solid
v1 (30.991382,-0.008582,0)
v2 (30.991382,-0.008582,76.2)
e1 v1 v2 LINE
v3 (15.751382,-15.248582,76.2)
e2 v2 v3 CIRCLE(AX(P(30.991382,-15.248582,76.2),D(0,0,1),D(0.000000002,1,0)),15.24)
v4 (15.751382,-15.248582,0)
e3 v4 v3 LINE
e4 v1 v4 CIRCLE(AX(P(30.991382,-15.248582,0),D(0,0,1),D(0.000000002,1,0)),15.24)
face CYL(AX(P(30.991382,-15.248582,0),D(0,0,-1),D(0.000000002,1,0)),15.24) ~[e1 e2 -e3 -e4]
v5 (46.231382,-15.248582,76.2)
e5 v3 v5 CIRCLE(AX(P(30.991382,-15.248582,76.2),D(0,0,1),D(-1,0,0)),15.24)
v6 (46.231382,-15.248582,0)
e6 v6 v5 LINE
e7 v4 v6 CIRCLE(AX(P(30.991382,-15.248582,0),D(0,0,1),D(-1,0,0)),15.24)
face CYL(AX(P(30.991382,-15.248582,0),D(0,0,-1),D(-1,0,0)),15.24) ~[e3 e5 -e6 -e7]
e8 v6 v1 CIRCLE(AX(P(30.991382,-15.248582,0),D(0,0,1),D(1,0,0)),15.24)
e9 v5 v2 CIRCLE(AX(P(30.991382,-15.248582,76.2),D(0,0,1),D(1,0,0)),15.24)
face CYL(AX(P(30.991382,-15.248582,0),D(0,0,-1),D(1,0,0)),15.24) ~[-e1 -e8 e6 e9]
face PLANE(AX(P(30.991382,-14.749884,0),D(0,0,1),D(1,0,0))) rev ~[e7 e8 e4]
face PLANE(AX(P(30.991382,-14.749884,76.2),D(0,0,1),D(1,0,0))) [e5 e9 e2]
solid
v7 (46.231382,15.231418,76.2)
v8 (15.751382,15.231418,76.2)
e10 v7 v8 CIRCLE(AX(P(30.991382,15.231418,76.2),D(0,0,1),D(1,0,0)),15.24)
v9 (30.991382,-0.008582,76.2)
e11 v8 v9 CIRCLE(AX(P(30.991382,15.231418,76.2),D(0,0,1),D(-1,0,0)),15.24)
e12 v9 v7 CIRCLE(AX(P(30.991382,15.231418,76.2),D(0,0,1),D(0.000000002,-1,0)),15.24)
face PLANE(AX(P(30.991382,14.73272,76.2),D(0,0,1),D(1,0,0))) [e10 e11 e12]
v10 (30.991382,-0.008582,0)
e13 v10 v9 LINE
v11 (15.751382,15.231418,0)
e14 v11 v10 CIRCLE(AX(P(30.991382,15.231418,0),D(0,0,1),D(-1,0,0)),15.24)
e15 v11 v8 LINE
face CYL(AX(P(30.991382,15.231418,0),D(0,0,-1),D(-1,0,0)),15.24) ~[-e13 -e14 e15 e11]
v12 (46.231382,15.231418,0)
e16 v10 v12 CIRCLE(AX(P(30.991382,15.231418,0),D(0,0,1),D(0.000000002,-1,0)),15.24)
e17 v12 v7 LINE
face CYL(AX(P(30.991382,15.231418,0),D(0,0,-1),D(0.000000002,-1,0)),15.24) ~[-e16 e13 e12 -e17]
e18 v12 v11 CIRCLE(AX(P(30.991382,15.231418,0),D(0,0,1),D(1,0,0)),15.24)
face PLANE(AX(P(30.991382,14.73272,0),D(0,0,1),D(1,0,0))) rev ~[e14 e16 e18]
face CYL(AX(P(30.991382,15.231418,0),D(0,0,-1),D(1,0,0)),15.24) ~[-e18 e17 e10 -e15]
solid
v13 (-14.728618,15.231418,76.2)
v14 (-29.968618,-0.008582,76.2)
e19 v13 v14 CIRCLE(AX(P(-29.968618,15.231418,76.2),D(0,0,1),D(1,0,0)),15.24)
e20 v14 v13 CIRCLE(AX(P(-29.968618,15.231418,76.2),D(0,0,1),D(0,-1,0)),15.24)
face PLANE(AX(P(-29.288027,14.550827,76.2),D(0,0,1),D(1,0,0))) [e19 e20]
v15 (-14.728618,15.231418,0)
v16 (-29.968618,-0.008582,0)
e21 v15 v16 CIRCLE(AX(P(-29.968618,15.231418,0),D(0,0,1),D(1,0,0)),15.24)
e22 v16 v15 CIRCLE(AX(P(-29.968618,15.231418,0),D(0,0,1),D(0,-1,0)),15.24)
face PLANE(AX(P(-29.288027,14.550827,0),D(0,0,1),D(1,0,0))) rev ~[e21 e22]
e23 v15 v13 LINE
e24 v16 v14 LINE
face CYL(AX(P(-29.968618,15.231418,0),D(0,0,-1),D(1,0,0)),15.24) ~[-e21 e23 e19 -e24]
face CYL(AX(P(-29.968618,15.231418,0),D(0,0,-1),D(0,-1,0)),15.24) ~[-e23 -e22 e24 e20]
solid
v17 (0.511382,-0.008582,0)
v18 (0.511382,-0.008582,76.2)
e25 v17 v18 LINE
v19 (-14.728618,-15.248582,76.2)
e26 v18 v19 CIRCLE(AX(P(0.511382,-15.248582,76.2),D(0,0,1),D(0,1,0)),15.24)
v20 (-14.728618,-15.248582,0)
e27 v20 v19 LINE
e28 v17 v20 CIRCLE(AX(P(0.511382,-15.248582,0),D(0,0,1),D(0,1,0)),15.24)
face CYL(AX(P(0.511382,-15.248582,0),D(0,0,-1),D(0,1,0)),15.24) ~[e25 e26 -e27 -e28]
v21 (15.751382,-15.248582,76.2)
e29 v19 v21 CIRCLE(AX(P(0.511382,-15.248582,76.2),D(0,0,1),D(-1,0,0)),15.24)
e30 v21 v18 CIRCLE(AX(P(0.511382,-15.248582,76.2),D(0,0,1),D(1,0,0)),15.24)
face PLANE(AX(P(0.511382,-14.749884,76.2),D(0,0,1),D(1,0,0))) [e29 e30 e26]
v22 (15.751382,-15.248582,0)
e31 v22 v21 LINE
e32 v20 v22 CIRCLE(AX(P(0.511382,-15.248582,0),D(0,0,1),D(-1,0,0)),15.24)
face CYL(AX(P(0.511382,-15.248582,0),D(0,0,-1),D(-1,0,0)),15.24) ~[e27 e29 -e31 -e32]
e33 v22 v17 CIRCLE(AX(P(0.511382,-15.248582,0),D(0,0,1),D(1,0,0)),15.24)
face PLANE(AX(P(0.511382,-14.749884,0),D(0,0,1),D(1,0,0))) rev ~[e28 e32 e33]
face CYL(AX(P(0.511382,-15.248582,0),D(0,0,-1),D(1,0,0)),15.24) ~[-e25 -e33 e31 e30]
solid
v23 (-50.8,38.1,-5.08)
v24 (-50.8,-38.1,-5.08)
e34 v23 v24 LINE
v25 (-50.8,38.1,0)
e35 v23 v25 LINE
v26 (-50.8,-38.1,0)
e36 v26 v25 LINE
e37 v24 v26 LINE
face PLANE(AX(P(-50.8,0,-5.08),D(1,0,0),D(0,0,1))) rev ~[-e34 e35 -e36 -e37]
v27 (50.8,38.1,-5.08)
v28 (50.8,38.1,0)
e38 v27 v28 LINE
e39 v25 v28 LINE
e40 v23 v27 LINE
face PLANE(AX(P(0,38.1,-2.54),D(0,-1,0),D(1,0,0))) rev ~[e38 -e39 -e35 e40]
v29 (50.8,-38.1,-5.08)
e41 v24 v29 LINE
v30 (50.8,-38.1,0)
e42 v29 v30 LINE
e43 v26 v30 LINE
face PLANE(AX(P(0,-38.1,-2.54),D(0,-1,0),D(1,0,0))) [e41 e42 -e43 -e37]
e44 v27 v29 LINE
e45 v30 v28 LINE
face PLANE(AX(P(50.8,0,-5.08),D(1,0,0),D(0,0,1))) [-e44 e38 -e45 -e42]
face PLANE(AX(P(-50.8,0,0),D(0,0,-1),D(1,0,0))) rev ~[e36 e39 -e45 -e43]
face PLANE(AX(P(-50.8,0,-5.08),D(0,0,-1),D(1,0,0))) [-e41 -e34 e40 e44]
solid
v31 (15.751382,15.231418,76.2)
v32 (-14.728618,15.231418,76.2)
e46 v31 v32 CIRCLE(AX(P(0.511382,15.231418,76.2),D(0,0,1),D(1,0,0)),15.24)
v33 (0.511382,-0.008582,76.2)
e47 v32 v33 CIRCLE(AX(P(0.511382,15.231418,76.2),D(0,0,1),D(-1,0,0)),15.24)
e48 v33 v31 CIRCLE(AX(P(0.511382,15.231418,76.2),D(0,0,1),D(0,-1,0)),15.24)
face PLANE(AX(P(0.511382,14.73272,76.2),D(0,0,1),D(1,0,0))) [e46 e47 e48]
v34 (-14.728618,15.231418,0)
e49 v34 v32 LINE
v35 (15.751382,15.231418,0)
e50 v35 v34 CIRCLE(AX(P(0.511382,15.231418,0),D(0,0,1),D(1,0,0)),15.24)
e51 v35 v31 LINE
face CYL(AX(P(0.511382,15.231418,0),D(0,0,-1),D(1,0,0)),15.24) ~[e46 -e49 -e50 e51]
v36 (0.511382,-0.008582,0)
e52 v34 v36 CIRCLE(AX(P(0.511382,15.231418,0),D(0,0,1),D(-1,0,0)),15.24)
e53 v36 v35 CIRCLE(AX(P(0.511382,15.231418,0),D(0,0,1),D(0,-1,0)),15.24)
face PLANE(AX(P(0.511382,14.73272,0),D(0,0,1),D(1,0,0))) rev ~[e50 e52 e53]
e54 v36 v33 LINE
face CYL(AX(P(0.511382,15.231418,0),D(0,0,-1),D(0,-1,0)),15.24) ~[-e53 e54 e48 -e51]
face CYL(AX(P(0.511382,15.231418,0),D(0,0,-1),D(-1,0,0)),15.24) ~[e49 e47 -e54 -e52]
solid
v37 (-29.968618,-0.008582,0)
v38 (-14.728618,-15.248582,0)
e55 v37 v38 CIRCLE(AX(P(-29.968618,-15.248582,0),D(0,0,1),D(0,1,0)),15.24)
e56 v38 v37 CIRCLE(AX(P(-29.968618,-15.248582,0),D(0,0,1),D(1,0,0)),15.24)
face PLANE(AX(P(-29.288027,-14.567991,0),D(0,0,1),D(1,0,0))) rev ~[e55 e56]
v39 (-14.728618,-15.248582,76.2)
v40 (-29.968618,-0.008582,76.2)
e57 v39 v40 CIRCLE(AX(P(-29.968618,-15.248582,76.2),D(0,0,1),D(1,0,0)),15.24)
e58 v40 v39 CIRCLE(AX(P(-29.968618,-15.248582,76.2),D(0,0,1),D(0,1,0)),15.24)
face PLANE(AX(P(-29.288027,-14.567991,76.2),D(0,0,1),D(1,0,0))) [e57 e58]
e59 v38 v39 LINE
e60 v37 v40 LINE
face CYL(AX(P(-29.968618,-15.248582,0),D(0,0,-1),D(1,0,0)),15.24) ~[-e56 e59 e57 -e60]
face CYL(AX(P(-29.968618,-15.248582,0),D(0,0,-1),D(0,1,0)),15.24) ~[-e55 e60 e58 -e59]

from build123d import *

# Parameters (mm, degrees)
F1_DEPTH = 76.2
F2_W     = 101.6
F2_H     = 5.08
F3_DEPTH = 38.1


# Not quite as in the source:
# - a feature names something its author has since deleted; it is built from what else it names


with BuildPart() as f1:
    # F0 (on Top) → F1 (new body)
    with BuildSketch(Plane.XY):
        with BuildLine():
            ThreePointArc((-29.9686177893, -0.0085821988), (-40.7449251346, -26.0248895441), (-14.7286177893, -15.2485821988))
            ThreePointArc((-14.7286177893, -15.2485821988), (-19.192310444, -4.4722748535), (-29.9686177893, -0.0085821988))
        make_face()
    extrude(amount=F1_DEPTH)


with BuildPart() as f1b:
    # F0 (on Top) → F1, piece 2 (new body)
    with BuildSketch(Plane.XY):
        with BuildLine():
            ThreePointArc((0.5113822094, -0.0085821988), (-10.264925135, -4.472274854), (-14.7286177893, -15.2485821988))
            ThreePointArc((-14.7286177893, -15.2485821988), (0.5113822107, -30.4885821988), (15.7513822107, -15.2485821988))
            ThreePointArc((15.7513822107, -15.2485821988), (11.2876895555, -4.4722748531), (0.5113822094, -0.0085821988))
        make_face()
    extrude(amount=F1_DEPTH)


with BuildPart() as f1c:
    # F0 (on Top) → F1, piece 3 (new body)
    with BuildSketch(Plane.XY):
        with BuildLine():
            ThreePointArc((-14.7286177893, 15.2314178012), (-40.7449251346, 26.0077251465), (-29.9686177893, -0.0085821988))
            ThreePointArc((-29.9686177893, -0.0085821988), (-19.192310444, 4.4551104559), (-14.7286177893, 15.2314178012))
        make_face()
    extrude(amount=F1_DEPTH)


with BuildPart() as f1d:
    # F0 (on Top) → F1, piece 4 (new body)
    with BuildSketch(Plane.XY):
        with BuildLine():
            ThreePointArc((30.9913822354, -0.0085821988), (20.2150748742, -4.4722748448), (15.7513822107, -15.2485821988))
            ThreePointArc((15.7513822107, -15.2485821988), (30.9913822107, -30.4885821988), (46.2313822107, -15.2485821988))
            ThreePointArc((46.2313822107, -15.2485821988), (41.7676895647, -4.4722748623), (30.9913822354, -0.0085821988))
        make_face()
    extrude(amount=F1_DEPTH)


with BuildPart() as f1e:
    # F0 (on Top) → F1, piece 5 (new body)
    with BuildSketch(Plane.XY):
        with BuildLine():
            ThreePointArc((-14.7286177893, 15.2314178012), (-10.264925135, 4.4551104564), (0.5113822094, -0.0085821988))
            ThreePointArc((0.5113822094, -0.0085821988), (11.2876895555, 4.4551104555), (15.7513822107, 15.2314178012))
            ThreePointArc((15.7513822107, 15.2314178012), (0.5113822107, 30.4714178012), (-14.7286177893, 15.2314178012))
        make_face()
    extrude(amount=F1_DEPTH)


with BuildPart() as f1f:
    # F0 (on Top) → F1, piece 6 (new body)
    with BuildSketch(Plane.XY):
        with BuildLine():
            ThreePointArc((15.7513822107, 15.2314178012), (20.2150748742, 4.4551104472), (30.9913822354, -0.0085821988))
            ThreePointArc((30.9913822354, -0.0085821988), (41.7676895647, 4.4551104647), (46.2313822107, 15.2314178012))
            ThreePointArc((46.2313822107, 15.2314178012), (30.9913822107, 30.4714178012), (15.7513822107, 15.2314178012))
        make_face()
    extrude(amount=F1_DEPTH)


with BuildPart() as f3:
    # F2 (on Front) → F3 (new body, symmetric)
    with BuildSketch(Plane.XZ):
        with Locations((0, -2.54)):
            Rectangle(F2_W, F2_H)
    extrude(amount=F3_DEPTH, both=True)


solid = Compound([f1.part, f1b.part, f1c.part, f1d.part, f1e.part, f1f.part, f3.part])
